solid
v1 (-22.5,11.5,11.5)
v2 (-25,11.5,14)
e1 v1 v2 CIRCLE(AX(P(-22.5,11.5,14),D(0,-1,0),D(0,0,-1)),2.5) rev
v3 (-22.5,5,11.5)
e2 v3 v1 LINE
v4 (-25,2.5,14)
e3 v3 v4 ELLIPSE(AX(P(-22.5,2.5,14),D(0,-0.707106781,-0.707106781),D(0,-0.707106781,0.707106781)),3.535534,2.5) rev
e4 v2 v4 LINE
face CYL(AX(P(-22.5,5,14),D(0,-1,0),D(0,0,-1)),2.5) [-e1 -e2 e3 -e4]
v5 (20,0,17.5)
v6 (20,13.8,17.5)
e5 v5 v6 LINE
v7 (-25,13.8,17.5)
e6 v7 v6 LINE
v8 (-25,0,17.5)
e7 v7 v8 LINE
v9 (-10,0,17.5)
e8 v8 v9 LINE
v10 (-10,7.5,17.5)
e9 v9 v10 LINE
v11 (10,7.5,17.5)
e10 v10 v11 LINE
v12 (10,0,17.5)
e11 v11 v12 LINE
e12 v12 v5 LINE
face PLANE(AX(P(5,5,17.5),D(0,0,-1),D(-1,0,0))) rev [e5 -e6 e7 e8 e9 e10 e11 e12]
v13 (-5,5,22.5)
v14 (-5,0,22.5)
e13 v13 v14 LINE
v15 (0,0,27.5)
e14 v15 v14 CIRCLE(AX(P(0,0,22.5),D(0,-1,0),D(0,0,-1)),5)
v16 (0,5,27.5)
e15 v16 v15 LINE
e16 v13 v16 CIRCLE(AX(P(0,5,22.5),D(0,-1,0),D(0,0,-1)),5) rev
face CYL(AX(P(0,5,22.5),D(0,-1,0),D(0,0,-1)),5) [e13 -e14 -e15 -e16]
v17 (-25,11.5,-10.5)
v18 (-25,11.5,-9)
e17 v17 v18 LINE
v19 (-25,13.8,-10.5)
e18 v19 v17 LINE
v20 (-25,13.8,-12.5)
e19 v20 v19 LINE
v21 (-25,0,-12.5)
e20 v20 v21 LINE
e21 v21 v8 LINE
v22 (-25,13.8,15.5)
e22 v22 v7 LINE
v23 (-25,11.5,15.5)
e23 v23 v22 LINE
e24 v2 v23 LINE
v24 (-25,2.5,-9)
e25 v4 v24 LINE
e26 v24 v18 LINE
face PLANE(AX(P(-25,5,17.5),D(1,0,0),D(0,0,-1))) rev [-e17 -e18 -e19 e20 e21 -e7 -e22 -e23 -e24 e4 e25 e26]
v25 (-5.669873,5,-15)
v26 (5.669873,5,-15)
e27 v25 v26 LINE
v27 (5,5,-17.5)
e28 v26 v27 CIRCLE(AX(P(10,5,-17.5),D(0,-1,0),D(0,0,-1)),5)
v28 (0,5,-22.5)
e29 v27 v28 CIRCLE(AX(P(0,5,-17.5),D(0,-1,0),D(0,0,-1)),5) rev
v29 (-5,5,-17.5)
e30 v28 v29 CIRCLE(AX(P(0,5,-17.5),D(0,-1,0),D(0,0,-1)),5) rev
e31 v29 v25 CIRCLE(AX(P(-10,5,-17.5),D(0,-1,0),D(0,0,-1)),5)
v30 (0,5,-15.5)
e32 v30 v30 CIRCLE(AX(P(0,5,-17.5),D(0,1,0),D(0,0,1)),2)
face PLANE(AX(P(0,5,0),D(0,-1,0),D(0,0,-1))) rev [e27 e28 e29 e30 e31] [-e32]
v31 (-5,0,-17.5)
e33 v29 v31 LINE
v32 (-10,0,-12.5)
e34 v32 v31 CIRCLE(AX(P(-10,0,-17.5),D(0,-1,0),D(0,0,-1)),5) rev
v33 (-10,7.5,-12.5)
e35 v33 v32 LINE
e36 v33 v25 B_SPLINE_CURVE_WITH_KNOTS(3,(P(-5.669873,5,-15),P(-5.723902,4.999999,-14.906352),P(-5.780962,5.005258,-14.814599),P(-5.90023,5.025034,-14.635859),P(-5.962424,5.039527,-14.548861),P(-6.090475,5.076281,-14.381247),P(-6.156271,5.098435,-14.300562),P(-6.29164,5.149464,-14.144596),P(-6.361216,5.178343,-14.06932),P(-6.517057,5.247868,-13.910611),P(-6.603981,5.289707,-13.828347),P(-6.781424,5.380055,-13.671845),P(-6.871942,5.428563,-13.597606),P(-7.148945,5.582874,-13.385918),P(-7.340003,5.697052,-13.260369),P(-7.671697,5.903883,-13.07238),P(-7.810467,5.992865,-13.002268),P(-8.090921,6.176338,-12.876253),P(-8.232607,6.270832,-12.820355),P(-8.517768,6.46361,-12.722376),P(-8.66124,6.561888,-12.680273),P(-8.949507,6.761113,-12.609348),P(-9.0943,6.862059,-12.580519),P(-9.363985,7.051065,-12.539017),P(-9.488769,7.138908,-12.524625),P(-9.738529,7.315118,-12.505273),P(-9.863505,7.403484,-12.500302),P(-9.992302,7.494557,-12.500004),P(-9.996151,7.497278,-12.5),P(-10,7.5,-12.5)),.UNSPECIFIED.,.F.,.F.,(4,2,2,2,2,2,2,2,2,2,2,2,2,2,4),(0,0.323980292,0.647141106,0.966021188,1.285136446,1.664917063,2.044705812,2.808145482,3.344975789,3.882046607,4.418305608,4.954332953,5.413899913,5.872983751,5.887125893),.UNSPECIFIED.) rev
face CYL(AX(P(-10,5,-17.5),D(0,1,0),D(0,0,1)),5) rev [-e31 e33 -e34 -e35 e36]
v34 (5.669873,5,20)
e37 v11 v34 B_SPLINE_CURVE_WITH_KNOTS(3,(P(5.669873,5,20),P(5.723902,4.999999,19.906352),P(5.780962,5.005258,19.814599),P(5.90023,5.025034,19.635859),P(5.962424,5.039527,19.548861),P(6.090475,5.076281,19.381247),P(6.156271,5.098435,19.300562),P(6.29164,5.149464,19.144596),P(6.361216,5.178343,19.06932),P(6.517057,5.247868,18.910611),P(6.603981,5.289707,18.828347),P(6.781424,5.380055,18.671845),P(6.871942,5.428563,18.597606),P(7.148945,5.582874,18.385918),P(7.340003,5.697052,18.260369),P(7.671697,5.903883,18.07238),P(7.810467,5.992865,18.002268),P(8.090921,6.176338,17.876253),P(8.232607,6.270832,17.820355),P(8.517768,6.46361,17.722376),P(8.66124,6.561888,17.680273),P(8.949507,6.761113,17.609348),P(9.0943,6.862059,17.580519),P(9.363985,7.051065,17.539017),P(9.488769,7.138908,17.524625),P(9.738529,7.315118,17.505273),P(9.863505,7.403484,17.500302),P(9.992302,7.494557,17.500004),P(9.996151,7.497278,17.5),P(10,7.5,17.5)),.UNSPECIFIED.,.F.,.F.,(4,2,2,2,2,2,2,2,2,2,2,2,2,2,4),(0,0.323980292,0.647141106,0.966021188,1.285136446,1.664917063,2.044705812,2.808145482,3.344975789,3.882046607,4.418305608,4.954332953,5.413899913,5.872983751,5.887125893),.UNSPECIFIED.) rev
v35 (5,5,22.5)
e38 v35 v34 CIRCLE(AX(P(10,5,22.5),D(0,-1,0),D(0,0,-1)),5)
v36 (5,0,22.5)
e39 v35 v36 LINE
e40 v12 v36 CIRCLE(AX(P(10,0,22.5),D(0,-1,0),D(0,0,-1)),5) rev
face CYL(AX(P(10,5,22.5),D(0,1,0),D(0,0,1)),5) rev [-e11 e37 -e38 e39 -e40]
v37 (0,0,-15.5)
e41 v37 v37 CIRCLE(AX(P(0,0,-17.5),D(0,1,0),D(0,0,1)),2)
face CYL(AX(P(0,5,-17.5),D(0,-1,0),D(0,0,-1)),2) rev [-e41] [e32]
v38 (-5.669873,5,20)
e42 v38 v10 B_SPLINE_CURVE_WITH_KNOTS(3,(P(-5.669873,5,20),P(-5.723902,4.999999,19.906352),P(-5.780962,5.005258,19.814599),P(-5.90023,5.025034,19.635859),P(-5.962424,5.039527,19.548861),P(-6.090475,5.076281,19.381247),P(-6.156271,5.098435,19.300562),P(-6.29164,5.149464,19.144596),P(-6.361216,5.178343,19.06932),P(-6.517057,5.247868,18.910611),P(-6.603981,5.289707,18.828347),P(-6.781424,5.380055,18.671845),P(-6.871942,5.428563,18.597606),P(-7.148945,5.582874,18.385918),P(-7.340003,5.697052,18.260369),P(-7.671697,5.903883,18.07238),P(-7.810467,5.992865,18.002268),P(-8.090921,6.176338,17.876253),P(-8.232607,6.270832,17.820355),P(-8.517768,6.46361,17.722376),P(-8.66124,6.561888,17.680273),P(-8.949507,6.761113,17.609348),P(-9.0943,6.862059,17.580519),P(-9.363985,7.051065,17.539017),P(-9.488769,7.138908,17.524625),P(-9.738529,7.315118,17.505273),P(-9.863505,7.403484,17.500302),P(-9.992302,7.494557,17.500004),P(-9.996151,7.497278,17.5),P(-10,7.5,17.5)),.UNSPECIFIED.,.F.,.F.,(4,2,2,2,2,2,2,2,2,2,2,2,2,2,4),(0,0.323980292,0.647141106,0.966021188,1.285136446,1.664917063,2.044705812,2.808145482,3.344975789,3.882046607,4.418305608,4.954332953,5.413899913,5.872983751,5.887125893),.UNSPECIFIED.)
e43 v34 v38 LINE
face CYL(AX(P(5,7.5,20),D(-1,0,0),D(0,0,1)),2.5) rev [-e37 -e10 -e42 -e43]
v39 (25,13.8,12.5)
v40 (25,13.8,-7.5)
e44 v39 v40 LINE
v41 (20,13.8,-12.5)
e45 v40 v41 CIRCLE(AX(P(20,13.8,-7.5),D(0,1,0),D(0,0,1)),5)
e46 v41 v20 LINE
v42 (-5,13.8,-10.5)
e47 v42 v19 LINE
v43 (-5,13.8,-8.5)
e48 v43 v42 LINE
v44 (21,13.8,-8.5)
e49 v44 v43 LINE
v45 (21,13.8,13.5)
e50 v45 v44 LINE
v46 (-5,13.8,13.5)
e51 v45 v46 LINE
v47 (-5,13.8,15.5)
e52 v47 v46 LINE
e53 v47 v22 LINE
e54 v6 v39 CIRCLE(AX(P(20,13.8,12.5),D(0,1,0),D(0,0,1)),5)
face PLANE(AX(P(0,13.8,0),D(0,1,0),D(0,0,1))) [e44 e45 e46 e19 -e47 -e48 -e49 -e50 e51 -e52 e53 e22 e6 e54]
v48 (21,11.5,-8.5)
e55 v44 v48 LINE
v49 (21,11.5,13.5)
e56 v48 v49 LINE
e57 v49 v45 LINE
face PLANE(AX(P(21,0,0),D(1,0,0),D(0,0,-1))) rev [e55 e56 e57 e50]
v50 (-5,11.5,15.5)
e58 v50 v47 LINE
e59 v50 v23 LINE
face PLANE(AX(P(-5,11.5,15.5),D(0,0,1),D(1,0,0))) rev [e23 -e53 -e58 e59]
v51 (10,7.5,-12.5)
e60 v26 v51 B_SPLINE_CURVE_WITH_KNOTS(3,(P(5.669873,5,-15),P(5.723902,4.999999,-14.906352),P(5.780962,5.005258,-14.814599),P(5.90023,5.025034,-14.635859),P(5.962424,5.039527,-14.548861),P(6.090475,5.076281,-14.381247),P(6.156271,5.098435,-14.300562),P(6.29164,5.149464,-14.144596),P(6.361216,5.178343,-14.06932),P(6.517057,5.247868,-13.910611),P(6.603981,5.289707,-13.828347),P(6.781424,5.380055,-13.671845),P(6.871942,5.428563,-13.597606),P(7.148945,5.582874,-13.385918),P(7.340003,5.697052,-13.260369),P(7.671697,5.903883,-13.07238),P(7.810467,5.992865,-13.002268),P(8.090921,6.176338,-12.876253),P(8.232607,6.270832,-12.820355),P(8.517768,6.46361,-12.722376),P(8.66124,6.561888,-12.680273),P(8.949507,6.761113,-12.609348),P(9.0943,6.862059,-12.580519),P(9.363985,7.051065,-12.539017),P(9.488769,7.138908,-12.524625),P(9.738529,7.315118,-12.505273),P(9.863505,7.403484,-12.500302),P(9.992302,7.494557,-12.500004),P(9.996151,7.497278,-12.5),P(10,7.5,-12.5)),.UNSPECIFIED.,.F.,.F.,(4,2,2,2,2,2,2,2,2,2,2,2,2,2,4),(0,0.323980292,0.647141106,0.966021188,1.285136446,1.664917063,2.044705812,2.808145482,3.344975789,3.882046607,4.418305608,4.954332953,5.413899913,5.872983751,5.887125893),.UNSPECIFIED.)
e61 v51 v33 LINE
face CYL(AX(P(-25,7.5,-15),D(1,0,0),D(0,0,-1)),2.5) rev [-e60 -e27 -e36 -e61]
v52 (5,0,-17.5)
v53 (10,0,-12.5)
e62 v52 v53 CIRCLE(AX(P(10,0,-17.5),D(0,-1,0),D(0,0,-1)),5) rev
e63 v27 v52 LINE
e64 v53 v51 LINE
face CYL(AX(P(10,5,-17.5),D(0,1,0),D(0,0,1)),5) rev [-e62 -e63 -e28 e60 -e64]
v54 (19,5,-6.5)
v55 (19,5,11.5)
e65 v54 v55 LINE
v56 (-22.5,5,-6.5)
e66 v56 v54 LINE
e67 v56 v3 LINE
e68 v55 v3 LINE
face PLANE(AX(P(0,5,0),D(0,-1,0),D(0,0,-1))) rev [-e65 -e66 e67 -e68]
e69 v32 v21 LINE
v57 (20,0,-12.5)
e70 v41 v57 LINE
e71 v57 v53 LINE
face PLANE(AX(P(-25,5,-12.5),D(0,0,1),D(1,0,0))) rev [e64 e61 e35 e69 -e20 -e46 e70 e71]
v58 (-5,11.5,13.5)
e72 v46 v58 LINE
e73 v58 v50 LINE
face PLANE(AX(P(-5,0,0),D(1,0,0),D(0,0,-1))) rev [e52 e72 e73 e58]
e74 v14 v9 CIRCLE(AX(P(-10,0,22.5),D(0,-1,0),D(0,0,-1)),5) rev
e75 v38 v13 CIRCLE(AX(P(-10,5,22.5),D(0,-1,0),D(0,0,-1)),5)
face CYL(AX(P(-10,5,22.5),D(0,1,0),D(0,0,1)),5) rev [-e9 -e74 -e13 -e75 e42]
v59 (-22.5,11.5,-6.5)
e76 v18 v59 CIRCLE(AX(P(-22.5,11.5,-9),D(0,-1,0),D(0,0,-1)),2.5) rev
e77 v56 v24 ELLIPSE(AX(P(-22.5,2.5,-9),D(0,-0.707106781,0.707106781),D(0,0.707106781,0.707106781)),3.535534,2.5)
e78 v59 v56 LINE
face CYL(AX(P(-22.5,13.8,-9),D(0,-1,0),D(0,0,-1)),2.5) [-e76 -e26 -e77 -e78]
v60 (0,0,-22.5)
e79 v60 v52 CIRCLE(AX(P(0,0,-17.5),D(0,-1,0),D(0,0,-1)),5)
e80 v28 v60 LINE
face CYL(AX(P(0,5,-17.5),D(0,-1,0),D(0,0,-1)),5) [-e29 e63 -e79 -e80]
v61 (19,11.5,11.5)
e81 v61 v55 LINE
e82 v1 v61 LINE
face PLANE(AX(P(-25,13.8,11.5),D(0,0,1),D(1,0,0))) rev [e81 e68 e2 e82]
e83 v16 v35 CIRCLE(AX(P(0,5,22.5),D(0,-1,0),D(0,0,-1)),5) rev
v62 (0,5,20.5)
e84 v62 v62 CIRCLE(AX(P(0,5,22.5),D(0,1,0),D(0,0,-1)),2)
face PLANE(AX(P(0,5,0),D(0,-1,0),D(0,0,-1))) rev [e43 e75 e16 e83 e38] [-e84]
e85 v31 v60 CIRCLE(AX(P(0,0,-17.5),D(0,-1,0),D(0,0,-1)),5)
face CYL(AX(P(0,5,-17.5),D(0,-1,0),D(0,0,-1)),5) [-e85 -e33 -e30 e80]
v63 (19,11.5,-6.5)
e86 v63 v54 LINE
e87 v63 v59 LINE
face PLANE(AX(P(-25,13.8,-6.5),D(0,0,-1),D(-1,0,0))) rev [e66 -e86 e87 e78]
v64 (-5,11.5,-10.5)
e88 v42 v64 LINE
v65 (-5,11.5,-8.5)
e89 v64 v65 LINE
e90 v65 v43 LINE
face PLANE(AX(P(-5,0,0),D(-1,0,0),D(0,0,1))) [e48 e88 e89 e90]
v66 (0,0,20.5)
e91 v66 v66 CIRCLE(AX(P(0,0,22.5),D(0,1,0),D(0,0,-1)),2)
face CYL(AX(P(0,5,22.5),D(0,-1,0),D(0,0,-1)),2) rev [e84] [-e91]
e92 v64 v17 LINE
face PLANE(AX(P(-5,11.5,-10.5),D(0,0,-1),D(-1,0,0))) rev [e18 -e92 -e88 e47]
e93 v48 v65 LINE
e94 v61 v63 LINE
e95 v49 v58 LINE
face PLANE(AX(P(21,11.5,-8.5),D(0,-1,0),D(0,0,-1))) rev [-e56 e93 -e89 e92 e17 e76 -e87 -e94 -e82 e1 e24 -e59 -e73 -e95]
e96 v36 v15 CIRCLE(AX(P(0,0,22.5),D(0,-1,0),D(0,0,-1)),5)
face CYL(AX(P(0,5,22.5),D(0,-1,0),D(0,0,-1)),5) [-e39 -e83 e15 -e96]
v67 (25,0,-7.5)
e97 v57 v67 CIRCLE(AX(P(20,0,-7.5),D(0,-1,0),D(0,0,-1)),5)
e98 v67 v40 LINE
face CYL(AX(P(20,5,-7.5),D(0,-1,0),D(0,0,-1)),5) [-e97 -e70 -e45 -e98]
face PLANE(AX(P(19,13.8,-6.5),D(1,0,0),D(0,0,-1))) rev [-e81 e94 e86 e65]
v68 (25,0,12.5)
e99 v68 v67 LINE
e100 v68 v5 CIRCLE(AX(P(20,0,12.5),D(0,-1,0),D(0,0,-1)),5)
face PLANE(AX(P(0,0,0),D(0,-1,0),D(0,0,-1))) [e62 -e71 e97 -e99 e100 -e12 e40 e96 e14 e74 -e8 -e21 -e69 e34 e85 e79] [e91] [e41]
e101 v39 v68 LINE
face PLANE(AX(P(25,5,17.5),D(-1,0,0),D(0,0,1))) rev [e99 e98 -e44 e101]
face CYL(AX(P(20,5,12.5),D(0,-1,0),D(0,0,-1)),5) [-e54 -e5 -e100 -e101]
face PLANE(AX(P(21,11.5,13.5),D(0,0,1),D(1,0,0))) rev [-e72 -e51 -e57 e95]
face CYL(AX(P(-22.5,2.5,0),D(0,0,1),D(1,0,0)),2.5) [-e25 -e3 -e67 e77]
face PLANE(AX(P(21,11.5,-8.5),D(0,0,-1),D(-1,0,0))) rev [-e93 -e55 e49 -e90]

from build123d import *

# Parameters (mm, degrees)
SKETCH2_R           = 2
BOSS_EXTRUDE1_DEPTH = 5
FILLET1_START       = -1
FILLET1_DEPTH       = 7
FILLET1_2_DEPTH     = 5
BOSS_EXTRUDE2_DEPTH = 8.8
SKETCH4_W           = 22
SKETCH4_H           = 2.3
CUT_EXTRUDE1_DEPTH  = 46
SKETCH5_W           = 2
SKETCH5_H           = 2.3
CUT_EXTRUDE2_DEPTH  = 20
FILLET2_R           = 5
FILLET3_R           = 2.5


with BuildPart() as part:
    # Sketch2 → Boss-Extrude1 (new body)
    with BuildSketch(Plane(origin=(0, 0, 0), x_dir=(1, 0, 0), z_dir=(0, 1, 0))):
        Polygon((5, 12.5), (25, 12.5), (25, -17.5), (5, -17.5), (5, -27.5), (-5, -27.5), (-5, -17.5), (-25, -17.5), (-25, 12.5), (-5, 12.5), (-5, 22.5), (5, 22.5), align=None)
        with Locations(Location((0, 17.5, 0), (0, 0, 270))):
            Circle(SKETCH2_R, mode=Mode.SUBTRACT)
        with Locations(Location((0, -22.5, 0), (0, 0, 90))):
            Circle(SKETCH2_R, mode=Mode.SUBTRACT)
    extrude(amount=BOSS_EXTRUDE1_DEPTH)

    # Fillet1: read off the stored shape, not the designer's step
    # Fillet1 outline → Fillet1 (cut)
    with BuildSketch(Plane(origin=(0, 0, 0), x_dir=(1, 0, 0), z_dir=(0, 1, 0)).offset(FILLET1_START)):
        with BuildLine():
            ThreePointArc((5, -22.5), (3.535533906, -26.035533906), (0, -27.5))
            Line((0, -27.5), (5, -27.5))
            Line((5, -27.5), (5, -22.5))
        make_face()
        with BuildLine():
            ThreePointArc((0, -27.5), (-3.535533906, -26.035533906), (-5, -22.5))
            Line((-5, -22.5), (-5, -27.5))
            Line((-5, -27.5), (0, -27.5))
        make_face()
        with BuildLine():
            ThreePointArc((-5, 17.5), (-3.535533906, 21.035533906), (0, 22.5))
            Line((0, 22.5), (-5, 22.5))
            Line((-5, 22.5), (-5, 17.5))
        make_face()
        with BuildLine():
            ThreePointArc((0, 22.5), (3.535533906, 21.035533906), (5, 17.5))
            Line((5, 17.5), (5, 22.5))
            Line((5, 22.5), (0, 22.5))
        make_face()
    extrude(amount=FILLET1_DEPTH, mode=Mode.SUBTRACT)

    # Fillet1 2 outline → Fillet1 2 (add)
    with BuildSketch(Plane(origin=(0, 0, 0), x_dir=(1, 0, 0), z_dir=(0, 1, 0))):
        with BuildLine():
            Line((5, -17.5), (5, -22.5))
            ThreePointArc((5, -22.5), (6.464466094, -18.964466094), (10, -17.5))
            Line((10, -17.5), (5, -17.5))
        make_face()
        with BuildLine():
            ThreePointArc((-10, -17.5), (-6.464466094, -18.964466094), (-5, -22.5))
            Line((-5, -22.5), (-5, -17.5))
            Line((-5, -17.5), (-10, -17.5))
        make_face()
        with BuildLine():
            Line((-5, 12.5), (-5, 17.5))
            ThreePointArc((-5, 17.5), (-6.464466094, 13.964466094), (-10, 12.5))
            Line((-10, 12.5), (-5, 12.5))
        make_face()
        with BuildLine():
            ThreePointArc((10, 12.5), (6.464466094, 13.964466094), (5, 17.5))
            Line((5, 17.5), (5, 12.5))
            Line((5, 12.5), (10, 12.5))
        make_face()
    extrude(amount=FILLET1_2_DEPTH)

    # Sketch3 → Boss-Extrude2 (add)
    with BuildSketch(Plane(origin=(0, 5, 0), x_dir=(1, 0, 0), z_dir=(0, 1, 0))):
        Polygon((-25, -11.5), (-25, -17.5), (25, -17.5), (25, 12.5), (-25, 12.5), (-25, 6.5), (19, 6.5), (19, -11.5), align=None)
    extrude(amount=BOSS_EXTRUDE2_DEPTH)

    # Sketch4 → Cut-Extrude1 (cut)
    with BuildSketch(Plane.ZY.offset(25)):
        with Locations((2.5, 12.65)):
            Rectangle(SKETCH4_W, SKETCH4_H)
    extrude(amount=-CUT_EXTRUDE1_DEPTH, mode=Mode.SUBTRACT)

    # Sketch5 → Cut-Extrude2 (cut)
    with BuildSketch(Plane.ZY.offset(25)):
        with Locations((-9.5, 12.65)):
            Rectangle(SKETCH5_W, SKETCH5_H)
        with Locations((14.5, 12.65)):
            Rectangle(SKETCH5_W, SKETCH5_H)
    extrude(amount=-CUT_EXTRUDE2_DEPTH, mode=Mode.SUBTRACT)

    # Fillet2
    fillet2_edges = [part.edges().sort_by_distance(p)[0] for p in [
        (25, 6.9, 17.5),
        (25, 6.9, -12.5),
    ]]
    fillet(fillet2_edges, radius=FILLET2_R)

    # Fillet3
    fillet3_edges = [part.edges().sort_by_distance(p)[0] for p in [
        (-25, 8.25, 11.5),
        (-25, 8.25, -6.5),
        (-25, 5, 2.5),
        (0, 5, 17.5),
        (0, 5, -12.5),
    ]]
    fillet(fillet3_edges, radius=FILLET3_R)


solid = part.part
